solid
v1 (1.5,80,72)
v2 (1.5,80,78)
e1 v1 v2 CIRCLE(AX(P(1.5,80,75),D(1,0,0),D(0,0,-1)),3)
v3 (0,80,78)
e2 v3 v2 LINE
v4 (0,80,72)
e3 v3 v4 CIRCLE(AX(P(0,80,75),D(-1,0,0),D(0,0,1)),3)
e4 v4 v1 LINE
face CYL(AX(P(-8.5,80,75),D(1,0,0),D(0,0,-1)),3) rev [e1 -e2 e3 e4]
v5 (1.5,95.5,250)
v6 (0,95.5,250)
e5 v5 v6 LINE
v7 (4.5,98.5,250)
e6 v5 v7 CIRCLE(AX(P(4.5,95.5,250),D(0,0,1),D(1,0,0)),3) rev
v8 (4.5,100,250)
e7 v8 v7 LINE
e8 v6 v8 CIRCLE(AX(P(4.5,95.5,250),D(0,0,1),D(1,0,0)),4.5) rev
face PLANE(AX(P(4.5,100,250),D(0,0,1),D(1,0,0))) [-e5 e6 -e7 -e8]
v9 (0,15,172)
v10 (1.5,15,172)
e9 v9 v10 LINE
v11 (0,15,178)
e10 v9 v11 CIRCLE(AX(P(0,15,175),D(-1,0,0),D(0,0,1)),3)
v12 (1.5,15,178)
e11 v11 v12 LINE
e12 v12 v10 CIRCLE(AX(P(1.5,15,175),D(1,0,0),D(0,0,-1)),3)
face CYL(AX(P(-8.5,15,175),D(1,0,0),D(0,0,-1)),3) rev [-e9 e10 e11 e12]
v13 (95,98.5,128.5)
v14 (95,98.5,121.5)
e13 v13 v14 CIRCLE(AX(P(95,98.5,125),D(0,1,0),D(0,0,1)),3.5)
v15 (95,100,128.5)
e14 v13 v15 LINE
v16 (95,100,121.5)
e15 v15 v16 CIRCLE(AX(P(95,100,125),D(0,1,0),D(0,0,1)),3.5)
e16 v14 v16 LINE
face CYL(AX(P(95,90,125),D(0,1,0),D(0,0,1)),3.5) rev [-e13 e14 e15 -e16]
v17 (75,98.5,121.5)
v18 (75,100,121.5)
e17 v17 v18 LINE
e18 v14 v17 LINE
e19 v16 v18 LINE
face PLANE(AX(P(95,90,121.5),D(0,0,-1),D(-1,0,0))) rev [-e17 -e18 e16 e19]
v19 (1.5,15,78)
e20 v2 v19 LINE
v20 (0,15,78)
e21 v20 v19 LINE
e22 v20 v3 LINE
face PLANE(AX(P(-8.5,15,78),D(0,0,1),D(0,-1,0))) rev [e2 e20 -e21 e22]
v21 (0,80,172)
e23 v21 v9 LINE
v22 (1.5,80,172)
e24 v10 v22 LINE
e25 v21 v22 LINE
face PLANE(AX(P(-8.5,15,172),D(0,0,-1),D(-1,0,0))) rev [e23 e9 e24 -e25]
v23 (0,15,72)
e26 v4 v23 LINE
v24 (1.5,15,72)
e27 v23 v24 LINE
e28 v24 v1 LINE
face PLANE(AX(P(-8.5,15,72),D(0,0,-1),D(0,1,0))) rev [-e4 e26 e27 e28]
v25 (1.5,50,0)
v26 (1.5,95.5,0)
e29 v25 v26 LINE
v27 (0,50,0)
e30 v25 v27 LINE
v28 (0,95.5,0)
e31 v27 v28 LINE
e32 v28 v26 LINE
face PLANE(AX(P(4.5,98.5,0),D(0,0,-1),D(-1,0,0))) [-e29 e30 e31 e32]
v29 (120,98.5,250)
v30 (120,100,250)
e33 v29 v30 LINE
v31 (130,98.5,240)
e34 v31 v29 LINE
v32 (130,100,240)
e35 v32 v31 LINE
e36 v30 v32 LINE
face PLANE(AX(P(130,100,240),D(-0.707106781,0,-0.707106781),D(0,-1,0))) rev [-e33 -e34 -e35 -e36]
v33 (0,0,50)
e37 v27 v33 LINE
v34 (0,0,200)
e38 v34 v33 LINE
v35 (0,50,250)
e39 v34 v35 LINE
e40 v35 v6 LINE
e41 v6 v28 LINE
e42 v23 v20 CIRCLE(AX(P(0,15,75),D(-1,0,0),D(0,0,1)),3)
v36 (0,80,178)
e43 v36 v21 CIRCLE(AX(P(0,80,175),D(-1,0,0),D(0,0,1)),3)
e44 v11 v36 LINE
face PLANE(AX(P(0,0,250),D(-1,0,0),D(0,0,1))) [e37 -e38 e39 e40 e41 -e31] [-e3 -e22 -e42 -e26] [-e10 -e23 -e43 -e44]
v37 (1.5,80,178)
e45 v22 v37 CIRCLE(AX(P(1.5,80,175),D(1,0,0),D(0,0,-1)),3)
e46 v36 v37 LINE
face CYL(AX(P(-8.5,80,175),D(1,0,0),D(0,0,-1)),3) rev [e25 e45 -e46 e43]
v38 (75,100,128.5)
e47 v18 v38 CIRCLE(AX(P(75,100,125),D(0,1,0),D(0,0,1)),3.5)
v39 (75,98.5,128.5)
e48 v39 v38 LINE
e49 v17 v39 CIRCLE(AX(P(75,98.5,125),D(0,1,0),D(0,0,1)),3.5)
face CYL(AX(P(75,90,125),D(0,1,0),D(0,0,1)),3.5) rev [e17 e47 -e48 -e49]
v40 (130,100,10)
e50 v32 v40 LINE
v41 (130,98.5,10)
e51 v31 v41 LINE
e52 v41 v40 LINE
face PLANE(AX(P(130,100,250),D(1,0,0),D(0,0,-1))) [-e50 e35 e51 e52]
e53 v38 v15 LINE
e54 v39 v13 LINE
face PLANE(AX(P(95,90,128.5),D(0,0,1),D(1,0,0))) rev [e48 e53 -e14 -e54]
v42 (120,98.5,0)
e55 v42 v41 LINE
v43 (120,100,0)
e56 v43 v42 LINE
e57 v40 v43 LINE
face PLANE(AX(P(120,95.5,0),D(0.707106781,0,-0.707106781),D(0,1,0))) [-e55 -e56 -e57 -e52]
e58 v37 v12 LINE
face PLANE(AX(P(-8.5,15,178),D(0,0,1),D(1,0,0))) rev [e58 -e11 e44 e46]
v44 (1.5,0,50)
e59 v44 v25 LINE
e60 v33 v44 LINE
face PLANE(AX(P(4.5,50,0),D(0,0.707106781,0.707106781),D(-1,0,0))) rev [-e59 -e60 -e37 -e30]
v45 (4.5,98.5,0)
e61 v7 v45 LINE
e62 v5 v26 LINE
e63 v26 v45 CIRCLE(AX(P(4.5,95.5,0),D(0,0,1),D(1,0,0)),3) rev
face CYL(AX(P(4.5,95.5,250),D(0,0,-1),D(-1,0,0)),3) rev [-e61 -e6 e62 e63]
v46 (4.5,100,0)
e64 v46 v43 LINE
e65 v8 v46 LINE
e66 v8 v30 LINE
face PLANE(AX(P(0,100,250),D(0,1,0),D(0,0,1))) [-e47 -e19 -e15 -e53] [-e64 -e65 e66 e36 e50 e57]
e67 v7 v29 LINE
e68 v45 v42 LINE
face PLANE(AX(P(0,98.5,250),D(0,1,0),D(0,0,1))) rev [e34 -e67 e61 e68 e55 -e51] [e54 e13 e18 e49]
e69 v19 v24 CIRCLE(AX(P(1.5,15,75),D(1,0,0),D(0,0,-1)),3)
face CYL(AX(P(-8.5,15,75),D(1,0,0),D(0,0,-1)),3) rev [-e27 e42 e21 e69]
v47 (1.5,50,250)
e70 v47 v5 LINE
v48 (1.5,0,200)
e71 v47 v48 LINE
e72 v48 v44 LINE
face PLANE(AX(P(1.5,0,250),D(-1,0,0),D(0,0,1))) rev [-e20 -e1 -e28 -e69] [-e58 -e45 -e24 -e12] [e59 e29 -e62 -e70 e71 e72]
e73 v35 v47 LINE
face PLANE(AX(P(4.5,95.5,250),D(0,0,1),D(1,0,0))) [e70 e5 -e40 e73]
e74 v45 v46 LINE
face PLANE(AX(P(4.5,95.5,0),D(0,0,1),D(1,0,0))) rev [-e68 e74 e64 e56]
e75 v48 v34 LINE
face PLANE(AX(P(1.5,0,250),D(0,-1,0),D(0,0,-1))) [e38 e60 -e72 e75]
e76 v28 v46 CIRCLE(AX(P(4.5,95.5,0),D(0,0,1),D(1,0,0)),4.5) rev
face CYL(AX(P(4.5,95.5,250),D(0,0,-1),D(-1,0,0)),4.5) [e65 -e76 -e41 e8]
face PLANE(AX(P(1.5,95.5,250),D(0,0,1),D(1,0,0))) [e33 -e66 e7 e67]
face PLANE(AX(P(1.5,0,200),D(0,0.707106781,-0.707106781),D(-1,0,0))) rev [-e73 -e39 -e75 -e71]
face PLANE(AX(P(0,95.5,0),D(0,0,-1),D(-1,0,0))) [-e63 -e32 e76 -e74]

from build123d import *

# Parameters (mm, degrees)
BASE_FLANGE1_DEPTH = 250
CUT_EXTRUDE1_DEPTH = 10
CHAMFER1_SIZE      = 10
CUT_EXTRUDE3_DEPTH = 10
CHAMFER2_SIZE      = 50


# Sheet-metal steps are written as plain solids
with BuildPart() as part:
    # Sketch1 → Base-Flange1 (new body)
    with BuildSketch(Plane.XY):
        with BuildLine():
            Line((0, 0), (0, 95.5))
            ThreePointArc((0, 95.5), (1.318019485, 98.681980515), (4.5, 100))
            Line((4.5, 100), (130, 100))
            Line((130, 100), (130, 98.5))
            Line((130, 98.5), (4.5, 98.5))
            ThreePointArc((4.5, 98.5), (2.378679656, 97.621320344), (1.5, 95.5))
            Line((1.5, 95.5), (1.5, 0))
            Line((1.5, 0), (0, 0))
        make_face()
    extrude(amount=BASE_FLANGE1_DEPTH)

    # Sketch6 → Cut-Extrude1 (cut)
    with BuildSketch(Plane(origin=(0, 100, 0), x_dir=(1, 0, 0), z_dir=(0, 1, 0))):
        with BuildLine():
            Line((95, -128.5), (75, -128.5))
            ThreePointArc((75, -128.5), (71.5, -125), (75, -121.5))
            Line((75, -121.5), (95, -121.5))
            ThreePointArc((95, -121.5), (98.5, -125), (95, -128.5))
        make_face()
    extrude(amount=-CUT_EXTRUDE1_DEPTH, mode=Mode.SUBTRACT)

    # Chamfer1
    chamfer1_edges = [part.edges().sort_by_distance(p)[0] for p in [
        (130, 99.25, 250),
        (130, 99.25, 0),
    ]]
    chamfer(chamfer1_edges, length=CHAMFER1_SIZE)

    # Sketch9 → Cut-Extrude3 (cut)
    with BuildSketch(Plane(origin=(1.5, 0, 0), x_dir=(0, 0, -1), z_dir=(1, 0, 0))):
        with BuildLine():
            Line((-178, 15), (-178, 80))
            ThreePointArc((-178, 80), (-175, 83), (-172, 80))
            Line((-172, 80), (-172, 15))
            ThreePointArc((-172, 15), (-175, 12), (-178, 15))
        make_face()
        with BuildLine():
            Line((-78, 15), (-78, 80))
            ThreePointArc((-78, 80), (-75, 83), (-72, 80))
            Line((-72, 80), (-72, 15))
            ThreePointArc((-72, 15), (-75, 12), (-78, 15))
        make_face()
    extrude(amount=-CUT_EXTRUDE3_DEPTH, mode=Mode.SUBTRACT)

    # Chamfer2
    chamfer2_edges = [part.edges().sort_by_distance(p)[0] for p in [
        (0.75, 0, 250),
        (0.75, 0, 0),
    ]]
    chamfer(chamfer2_edges, length=CHAMFER2_SIZE)


solid = part.part
